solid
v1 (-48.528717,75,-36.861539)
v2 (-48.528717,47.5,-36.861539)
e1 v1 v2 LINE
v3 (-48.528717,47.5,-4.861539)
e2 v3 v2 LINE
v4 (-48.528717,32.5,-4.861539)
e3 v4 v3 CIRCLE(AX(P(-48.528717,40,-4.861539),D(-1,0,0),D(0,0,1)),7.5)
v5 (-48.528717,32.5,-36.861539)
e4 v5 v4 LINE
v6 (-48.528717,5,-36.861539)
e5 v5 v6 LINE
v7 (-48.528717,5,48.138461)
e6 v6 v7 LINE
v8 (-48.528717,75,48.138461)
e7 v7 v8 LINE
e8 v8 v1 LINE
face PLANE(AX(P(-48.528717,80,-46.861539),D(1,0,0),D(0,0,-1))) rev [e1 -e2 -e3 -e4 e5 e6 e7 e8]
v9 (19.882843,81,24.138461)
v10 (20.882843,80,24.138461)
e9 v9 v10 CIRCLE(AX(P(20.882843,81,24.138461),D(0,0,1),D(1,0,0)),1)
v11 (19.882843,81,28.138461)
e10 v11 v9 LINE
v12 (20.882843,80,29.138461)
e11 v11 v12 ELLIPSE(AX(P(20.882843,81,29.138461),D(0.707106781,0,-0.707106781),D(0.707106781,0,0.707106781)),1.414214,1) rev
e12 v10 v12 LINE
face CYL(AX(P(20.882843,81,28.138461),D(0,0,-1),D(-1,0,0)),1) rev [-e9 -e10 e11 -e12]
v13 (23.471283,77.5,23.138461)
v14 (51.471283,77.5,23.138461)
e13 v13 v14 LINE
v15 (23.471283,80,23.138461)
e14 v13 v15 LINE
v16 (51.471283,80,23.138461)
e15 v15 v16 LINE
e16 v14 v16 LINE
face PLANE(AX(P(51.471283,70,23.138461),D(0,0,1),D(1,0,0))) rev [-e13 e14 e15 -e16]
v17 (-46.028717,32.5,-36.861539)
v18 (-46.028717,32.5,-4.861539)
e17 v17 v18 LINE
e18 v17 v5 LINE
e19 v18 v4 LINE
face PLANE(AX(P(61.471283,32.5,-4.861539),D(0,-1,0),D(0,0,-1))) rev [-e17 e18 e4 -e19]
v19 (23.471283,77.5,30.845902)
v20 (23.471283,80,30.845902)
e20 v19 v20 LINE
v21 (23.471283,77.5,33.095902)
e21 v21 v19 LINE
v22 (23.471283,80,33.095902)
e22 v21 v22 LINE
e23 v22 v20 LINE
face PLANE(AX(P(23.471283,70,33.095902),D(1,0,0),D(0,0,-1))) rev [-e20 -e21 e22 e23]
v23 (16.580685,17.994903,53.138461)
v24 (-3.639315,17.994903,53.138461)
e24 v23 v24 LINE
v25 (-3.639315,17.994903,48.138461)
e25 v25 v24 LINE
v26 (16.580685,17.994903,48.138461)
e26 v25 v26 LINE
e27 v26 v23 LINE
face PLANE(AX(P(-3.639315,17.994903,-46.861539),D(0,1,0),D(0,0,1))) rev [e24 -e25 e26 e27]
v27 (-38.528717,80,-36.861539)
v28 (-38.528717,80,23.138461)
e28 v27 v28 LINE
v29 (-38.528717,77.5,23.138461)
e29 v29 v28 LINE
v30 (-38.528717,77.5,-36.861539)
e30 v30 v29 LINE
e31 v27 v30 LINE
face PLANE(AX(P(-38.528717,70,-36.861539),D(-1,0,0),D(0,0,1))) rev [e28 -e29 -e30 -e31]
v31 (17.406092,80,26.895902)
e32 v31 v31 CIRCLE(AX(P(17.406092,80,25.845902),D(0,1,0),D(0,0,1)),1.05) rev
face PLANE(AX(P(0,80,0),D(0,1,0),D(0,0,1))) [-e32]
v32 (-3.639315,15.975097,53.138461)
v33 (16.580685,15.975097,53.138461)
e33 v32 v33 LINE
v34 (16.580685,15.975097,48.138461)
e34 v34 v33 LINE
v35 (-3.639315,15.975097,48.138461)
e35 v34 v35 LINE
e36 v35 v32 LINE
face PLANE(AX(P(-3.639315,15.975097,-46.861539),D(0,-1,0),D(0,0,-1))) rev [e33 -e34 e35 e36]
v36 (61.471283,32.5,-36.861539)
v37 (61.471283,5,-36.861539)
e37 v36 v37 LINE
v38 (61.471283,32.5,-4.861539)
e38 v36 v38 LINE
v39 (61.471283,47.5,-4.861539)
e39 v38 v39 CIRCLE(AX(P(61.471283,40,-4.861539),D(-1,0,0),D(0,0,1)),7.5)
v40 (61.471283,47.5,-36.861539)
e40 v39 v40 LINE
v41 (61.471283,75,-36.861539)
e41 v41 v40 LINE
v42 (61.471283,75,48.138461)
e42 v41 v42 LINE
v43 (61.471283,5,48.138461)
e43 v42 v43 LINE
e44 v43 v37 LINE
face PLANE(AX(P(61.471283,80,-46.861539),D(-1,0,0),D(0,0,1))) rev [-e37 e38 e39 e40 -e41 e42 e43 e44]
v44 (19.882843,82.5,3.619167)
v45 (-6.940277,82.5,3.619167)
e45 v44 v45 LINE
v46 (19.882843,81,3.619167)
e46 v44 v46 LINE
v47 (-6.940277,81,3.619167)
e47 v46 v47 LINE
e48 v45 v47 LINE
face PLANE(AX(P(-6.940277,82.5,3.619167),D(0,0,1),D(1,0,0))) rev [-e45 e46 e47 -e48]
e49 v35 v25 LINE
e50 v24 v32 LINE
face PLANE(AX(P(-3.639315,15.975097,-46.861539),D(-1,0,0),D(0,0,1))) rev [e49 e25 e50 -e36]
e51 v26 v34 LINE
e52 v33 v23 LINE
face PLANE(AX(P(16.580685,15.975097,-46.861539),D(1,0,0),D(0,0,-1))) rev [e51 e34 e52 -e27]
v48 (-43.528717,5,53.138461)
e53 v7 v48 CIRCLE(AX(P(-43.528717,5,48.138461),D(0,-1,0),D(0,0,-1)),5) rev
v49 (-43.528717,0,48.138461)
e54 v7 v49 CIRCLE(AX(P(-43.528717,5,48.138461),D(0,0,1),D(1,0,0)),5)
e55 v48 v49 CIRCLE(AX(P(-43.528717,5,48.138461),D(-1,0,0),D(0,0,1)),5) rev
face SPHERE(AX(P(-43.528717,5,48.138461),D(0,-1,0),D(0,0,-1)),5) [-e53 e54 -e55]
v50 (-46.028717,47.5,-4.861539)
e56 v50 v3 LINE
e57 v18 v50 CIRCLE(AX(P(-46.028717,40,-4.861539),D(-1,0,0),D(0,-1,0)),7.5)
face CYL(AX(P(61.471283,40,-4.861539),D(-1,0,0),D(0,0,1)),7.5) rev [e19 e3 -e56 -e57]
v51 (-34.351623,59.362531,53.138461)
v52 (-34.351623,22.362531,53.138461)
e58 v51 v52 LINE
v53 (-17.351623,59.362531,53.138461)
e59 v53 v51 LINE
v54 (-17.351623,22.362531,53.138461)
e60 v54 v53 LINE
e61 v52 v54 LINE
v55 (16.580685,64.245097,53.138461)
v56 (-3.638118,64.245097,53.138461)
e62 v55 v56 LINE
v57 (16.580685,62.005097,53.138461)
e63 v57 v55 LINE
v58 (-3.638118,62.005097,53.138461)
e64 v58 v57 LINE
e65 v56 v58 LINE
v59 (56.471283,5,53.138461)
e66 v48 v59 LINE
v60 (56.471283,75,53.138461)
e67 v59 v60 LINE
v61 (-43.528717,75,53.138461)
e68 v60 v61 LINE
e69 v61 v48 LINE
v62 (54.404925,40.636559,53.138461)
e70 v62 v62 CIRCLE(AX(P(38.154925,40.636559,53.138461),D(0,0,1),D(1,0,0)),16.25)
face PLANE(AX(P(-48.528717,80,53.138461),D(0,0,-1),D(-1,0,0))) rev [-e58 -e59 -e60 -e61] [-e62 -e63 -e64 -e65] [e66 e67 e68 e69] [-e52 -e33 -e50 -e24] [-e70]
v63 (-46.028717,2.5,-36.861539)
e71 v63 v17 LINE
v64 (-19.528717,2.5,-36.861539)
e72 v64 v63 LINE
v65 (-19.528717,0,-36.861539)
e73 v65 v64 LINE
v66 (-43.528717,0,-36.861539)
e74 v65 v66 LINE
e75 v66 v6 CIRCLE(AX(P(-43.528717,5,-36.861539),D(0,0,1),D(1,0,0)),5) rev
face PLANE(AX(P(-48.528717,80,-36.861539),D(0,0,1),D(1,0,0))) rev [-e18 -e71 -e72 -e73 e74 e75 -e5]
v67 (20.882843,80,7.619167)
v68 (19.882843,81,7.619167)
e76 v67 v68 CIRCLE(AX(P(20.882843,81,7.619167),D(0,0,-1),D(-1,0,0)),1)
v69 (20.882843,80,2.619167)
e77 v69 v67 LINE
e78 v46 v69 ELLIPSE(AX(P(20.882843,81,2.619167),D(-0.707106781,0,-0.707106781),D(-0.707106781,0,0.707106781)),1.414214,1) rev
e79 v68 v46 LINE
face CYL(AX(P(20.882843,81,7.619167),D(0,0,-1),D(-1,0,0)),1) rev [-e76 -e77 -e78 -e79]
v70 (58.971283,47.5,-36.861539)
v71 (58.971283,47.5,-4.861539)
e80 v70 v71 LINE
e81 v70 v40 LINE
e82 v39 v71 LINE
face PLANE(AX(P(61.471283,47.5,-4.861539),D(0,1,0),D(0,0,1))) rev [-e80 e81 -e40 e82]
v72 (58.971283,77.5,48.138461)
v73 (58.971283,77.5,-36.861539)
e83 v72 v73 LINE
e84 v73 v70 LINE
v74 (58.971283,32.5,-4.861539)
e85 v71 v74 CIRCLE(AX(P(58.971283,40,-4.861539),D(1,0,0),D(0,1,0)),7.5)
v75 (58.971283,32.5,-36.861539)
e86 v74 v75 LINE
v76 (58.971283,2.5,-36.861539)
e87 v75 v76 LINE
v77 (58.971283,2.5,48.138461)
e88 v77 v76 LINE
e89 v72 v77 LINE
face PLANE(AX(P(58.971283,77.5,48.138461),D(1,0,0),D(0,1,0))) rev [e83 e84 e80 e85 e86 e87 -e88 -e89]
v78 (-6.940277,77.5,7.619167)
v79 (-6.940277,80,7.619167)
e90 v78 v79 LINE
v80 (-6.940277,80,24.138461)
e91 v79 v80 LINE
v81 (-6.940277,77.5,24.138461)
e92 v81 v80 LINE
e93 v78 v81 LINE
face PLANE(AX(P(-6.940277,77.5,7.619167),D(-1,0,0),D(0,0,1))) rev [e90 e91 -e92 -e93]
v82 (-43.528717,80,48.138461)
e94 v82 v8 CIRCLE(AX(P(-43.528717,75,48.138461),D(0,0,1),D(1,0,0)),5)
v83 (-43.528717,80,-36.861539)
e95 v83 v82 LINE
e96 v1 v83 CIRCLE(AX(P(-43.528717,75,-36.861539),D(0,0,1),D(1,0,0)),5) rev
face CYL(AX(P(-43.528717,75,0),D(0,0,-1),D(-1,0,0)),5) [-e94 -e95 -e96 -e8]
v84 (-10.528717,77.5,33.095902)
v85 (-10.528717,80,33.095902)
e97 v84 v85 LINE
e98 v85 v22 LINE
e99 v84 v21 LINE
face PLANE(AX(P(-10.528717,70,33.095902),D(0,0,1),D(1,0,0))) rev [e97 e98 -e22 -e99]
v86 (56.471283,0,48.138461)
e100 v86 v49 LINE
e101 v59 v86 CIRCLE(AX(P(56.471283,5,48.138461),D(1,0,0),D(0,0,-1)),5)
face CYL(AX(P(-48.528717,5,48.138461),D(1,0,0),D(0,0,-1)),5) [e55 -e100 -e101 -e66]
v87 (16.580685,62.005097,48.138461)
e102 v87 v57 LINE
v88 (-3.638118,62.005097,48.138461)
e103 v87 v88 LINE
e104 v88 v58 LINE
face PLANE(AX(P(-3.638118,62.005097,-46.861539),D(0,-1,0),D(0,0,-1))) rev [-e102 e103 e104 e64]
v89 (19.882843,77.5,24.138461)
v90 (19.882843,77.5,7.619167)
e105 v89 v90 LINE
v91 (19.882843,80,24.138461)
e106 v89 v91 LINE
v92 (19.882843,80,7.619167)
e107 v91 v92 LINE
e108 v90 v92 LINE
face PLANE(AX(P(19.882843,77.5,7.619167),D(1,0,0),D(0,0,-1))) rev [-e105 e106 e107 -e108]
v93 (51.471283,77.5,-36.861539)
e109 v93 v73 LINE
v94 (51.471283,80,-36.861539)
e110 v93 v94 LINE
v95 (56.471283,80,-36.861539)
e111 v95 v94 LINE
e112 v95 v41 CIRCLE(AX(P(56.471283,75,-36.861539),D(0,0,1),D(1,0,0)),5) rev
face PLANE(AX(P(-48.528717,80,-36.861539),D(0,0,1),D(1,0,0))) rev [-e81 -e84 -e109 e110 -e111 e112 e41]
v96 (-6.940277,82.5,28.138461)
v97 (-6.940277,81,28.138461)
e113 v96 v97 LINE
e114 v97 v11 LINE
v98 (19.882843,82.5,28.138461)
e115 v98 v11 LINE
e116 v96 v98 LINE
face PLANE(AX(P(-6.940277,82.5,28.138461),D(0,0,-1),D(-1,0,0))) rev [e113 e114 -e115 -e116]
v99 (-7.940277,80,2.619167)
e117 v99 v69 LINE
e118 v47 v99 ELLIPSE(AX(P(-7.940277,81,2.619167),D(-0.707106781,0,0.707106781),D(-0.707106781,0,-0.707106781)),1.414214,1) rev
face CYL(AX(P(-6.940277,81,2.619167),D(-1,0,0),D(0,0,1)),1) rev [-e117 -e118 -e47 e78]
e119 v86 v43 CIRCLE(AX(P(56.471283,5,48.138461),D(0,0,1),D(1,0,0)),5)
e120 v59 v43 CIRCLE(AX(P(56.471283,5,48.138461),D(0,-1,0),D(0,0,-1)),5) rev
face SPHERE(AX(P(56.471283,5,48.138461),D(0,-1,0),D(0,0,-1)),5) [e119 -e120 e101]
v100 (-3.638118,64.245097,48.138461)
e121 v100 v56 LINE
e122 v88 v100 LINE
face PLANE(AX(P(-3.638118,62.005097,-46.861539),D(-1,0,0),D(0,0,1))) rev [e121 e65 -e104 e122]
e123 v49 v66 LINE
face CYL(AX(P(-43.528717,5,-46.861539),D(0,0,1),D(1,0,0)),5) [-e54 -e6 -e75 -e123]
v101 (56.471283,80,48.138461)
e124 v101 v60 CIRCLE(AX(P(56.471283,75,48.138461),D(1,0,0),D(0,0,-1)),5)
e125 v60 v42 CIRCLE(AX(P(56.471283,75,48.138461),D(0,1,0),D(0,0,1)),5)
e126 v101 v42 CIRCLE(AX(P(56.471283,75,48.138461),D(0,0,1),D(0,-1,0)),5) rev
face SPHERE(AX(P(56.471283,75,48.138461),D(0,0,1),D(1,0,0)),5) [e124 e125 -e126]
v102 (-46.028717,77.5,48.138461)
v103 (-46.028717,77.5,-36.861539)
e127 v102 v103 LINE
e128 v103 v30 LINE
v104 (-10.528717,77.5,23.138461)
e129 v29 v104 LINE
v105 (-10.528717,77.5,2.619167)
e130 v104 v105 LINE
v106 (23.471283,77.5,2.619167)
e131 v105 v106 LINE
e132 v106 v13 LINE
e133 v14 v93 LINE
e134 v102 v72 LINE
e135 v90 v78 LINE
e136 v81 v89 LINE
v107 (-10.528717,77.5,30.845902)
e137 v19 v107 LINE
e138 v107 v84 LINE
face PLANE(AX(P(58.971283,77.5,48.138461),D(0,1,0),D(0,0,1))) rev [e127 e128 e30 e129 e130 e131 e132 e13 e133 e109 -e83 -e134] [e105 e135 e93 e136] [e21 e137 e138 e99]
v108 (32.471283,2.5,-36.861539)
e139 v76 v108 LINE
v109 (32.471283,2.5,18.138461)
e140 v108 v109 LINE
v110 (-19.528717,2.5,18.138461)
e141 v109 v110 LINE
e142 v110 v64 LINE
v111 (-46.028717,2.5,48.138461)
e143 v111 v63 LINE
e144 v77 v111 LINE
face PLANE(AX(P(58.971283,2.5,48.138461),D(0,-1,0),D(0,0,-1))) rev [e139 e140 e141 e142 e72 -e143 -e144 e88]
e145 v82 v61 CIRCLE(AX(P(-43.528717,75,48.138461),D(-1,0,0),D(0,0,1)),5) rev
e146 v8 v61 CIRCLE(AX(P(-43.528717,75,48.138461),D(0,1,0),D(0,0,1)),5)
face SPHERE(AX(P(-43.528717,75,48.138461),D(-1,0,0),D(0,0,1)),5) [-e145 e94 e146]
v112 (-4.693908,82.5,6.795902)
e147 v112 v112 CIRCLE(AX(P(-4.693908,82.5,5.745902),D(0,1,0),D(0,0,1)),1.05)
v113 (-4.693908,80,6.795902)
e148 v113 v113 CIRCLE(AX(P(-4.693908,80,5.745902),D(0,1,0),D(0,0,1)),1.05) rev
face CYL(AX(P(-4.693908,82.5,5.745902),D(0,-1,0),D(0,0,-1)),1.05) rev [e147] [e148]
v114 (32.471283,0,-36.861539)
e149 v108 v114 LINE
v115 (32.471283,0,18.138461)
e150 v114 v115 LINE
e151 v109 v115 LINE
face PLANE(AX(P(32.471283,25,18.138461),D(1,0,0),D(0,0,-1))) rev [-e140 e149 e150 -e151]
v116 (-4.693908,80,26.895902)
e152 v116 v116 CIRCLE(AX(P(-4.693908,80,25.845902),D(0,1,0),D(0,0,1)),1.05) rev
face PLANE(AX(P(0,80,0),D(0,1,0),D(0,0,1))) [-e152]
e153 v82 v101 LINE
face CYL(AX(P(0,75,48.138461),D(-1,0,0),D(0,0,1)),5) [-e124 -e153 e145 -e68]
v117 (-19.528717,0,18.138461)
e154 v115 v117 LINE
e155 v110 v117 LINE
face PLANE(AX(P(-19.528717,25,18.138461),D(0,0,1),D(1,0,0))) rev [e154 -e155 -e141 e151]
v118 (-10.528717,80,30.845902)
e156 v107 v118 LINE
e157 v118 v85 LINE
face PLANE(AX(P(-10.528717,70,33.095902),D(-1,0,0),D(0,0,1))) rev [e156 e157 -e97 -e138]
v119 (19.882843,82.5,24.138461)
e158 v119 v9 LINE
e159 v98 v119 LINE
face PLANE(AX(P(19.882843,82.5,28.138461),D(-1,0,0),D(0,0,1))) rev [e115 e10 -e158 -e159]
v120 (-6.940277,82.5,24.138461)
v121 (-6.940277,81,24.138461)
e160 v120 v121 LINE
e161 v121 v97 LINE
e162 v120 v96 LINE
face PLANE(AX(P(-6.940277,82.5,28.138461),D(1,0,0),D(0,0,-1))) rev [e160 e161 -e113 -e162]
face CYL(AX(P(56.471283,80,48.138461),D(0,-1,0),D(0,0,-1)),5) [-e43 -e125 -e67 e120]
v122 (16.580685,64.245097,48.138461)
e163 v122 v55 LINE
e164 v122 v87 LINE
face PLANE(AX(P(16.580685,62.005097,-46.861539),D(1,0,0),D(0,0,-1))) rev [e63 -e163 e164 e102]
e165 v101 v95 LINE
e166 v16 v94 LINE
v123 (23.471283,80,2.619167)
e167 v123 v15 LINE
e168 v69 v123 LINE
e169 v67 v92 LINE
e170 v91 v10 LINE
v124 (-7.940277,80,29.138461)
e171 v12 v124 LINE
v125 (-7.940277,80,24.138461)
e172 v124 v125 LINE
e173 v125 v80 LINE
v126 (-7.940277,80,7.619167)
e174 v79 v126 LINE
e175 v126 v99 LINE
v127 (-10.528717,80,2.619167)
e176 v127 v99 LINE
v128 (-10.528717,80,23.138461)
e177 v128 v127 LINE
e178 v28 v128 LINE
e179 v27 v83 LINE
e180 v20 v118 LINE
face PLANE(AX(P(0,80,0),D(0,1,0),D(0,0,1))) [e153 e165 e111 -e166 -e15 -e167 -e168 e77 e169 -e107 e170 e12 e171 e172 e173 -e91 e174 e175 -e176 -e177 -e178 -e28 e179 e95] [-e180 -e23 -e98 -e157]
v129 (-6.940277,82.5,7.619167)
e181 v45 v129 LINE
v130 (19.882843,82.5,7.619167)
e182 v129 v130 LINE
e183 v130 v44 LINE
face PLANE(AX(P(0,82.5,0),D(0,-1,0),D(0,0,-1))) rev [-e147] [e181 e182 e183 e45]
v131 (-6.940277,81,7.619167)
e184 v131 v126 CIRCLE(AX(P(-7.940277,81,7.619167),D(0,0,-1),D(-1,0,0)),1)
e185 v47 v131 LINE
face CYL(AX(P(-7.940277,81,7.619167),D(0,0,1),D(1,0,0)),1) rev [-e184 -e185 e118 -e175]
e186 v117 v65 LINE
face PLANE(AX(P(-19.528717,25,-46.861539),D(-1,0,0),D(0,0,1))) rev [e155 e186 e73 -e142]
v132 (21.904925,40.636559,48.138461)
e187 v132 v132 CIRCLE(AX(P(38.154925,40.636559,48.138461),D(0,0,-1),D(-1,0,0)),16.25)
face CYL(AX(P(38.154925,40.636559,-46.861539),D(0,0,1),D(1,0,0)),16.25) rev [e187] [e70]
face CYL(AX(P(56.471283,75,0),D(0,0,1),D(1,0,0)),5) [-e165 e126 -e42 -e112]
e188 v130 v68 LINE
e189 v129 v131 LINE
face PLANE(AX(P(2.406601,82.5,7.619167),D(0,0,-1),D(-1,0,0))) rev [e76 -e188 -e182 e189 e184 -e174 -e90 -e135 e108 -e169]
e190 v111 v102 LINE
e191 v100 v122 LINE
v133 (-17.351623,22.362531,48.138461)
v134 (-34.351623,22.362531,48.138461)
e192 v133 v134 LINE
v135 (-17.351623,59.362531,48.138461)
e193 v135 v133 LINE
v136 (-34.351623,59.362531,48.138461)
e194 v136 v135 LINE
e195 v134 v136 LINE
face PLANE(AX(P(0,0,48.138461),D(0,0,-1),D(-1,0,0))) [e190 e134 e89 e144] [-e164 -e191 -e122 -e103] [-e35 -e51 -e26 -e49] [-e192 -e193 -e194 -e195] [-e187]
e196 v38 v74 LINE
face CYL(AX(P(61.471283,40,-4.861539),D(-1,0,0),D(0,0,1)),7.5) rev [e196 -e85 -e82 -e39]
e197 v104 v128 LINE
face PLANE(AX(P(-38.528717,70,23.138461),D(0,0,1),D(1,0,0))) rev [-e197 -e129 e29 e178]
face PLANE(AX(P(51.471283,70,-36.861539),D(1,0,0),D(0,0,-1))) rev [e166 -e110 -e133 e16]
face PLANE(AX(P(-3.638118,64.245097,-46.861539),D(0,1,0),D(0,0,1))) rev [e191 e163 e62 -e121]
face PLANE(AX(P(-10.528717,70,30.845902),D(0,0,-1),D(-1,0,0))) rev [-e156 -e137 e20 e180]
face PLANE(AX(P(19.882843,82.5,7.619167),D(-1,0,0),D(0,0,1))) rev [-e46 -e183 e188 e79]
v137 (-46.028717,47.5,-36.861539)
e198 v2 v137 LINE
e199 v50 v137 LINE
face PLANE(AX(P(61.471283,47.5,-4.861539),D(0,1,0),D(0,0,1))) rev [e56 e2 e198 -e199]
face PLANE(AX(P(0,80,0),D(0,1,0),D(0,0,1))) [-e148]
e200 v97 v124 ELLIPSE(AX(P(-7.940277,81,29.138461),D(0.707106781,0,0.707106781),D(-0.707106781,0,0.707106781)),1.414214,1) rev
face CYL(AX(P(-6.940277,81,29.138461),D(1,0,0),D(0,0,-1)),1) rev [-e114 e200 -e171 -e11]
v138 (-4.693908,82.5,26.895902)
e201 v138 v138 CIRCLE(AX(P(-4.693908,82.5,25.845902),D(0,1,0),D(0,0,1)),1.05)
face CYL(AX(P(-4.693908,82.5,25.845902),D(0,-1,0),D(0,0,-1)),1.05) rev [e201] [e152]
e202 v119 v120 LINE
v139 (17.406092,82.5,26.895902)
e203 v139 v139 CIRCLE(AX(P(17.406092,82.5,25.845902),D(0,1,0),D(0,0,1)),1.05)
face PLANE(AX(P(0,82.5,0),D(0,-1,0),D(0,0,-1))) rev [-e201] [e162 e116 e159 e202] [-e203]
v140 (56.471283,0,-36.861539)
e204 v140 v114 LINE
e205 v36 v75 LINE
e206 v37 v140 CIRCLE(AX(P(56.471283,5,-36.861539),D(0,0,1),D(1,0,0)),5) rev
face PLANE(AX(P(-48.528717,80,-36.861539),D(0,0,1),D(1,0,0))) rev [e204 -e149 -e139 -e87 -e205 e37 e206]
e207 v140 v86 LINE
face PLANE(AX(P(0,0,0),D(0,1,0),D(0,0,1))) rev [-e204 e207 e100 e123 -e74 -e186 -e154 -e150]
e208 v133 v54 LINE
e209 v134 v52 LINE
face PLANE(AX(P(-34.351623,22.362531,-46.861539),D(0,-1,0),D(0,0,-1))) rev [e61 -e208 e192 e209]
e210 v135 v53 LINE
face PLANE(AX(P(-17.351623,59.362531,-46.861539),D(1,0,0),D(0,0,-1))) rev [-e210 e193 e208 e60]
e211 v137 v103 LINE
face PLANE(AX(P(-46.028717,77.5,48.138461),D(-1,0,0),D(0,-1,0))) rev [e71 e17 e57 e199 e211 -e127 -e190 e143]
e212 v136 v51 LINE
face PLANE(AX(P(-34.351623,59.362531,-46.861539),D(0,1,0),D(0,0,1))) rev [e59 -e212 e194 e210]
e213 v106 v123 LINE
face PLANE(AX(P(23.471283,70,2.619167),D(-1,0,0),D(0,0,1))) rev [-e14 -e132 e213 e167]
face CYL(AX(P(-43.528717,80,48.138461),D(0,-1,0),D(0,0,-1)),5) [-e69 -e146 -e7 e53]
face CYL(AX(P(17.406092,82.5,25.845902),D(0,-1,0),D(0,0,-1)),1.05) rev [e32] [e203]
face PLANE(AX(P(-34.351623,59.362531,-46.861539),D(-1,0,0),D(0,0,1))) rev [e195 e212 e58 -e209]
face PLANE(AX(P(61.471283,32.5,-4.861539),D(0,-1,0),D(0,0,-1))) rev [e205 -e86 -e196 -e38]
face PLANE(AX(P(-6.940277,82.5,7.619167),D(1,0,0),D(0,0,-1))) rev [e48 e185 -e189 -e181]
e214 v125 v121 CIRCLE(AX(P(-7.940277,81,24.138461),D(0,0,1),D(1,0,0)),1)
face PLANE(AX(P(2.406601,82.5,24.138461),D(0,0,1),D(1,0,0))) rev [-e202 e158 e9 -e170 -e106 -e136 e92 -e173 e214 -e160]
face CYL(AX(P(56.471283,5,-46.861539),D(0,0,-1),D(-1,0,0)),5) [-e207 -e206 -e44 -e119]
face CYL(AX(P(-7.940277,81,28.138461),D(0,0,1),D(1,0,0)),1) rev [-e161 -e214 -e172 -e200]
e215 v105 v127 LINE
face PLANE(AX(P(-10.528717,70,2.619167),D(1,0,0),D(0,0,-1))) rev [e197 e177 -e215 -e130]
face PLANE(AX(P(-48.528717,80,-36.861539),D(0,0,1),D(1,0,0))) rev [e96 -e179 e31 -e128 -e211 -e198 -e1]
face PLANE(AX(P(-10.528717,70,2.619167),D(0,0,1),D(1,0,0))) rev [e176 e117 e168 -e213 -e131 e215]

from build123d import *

# Parameters (mm, degrees)
ESQUISSE1_W             = 110
ESQUISSE1_H             = 100
BOSS_EXTRU_1_DEPTH      = 80
ESQUISSE3_W             = 105
ESQUISSE3_H             = 75
ENL_V_MAT_EXTRU_1_DEPTH = 95
ESQUISSE4_R             = 16.25
ESQUISSE4_W             = 17
ESQUISSE4_H             = 37
ESQUISSE4_W_2           = 20.218803133
ESQUISSE4_H_2           = 2.24
ESQUISSE4_W_3           = 20.22
ESQUISSE4_H_3           = 2.019806643
ENL_V_MAT_EXTRU_2_DEPTH = 143.051816821
CONG_2_R                = 5
ENL_V_MAT_EXTRU_3_DEPTH = 25
ENL_V_MAT_EXTRU_4_DEPTH = 147.026353909
ESQUISSE7_W             = 110
ESQUISSE7_H             = 10
ENL_V_MAT_EXTRU_5_DEPTH = 115.028131169
ESQUISSE8_R             = 1.05
BOSS_EXTRU_4_DEPTH      = 2.5
ESQUISSE12_W            = 26.823119757
ESQUISSE12_H            = 16.51929352
ENL_V_MAT_EXTRU_8_DEPTH = 2.5
CONG_3_R                = 1
ESQUISSE13_W            = 34
ESQUISSE13_H            = 2.25
ENL_V_MAT_EXTRU_9_DEPTH = 10


with BuildPart() as part:
    # Esquisse1 → Boss.-Extru.1 (new body)
    with BuildSketch(Plane(origin=(0, 0, 0), x_dir=(1, 0, 0), z_dir=(0, 1, 0))):
        with Locations((6.471283231, -3.138460985)):
            Rectangle(ESQUISSE1_W, ESQUISSE1_H)
    extrude(amount=BOSS_EXTRU_1_DEPTH)

    # Esquisse3 → Enlèv. mat.-Extru.1 (cut)
    with BuildSketch(Plane(origin=(0, 0, -46.861539015), x_dir=(-1, 0, 0), z_dir=(0, 0, -1))):
        with Locations((-6.471283231, 40)):
            Rectangle(ESQUISSE3_W, ESQUISSE3_H)
    extrude(amount=-ENL_V_MAT_EXTRU_1_DEPTH, mode=Mode.SUBTRACT)

    # Esquisse4 → Enlèv. mat.-Extru.2 (cut, through all)
    with BuildSketch(Plane.XY.offset(53.138460985)):
        with Locations((38.154925434, 40.636559031)):
            Circle(ESQUISSE4_R)
        with Locations((-25.851622586, 40.86253144)):
            Rectangle(ESQUISSE4_W, ESQUISSE4_H)
        with Locations((6.471283232, 63.12509684)):
            Rectangle(ESQUISSE4_W_2, ESQUISSE4_H_2)
        with Locations((6.470684798, 16.984999839)):
            Rectangle(ESQUISSE4_W_3, ESQUISSE4_H_3)
    extrude(amount=-ENL_V_MAT_EXTRU_2_DEPTH, mode=Mode.SUBTRACT)

    # Congé2
    cong_2_edges = [part.edges().sort_by_distance(p)[0] for p in [
        (61.471283231, 80, 3.138460985),
        (-48.528716769, 80, 3.138460985),
        (61.471283231, 0, 3.138460985),
        (6.471283231, 0, 53.138460985),
        (-48.528716769, 0, 3.138460985),
        (61.471283231, 40, 53.138460985),
        (-48.528716769, 40, 53.138460985),
        (6.471283231, 80, 53.138460985),
    ]]
    fillet(cong_2_edges, radius=CONG_2_R)

    # Esquisse5 → Enlèv. mat.-Extru.3 (cut)
    with BuildSketch(Plane.XZ):
        Polygon((6.471283231, -46.861539015), (32.471283231, -46.861539015), (32.471283231, 18.138460985), (-19.528716769, 18.138460985), (-19.528716769, -46.861539015), align=None)
    extrude(amount=-ENL_V_MAT_EXTRU_3_DEPTH, mode=Mode.SUBTRACT)

    # Esquisse6 → Enlèv. mat.-Extru.4 (cut, through all)
    with BuildSketch(Plane.ZY.offset(48.528716769)):
        with BuildLine():
            Line((-4.861539015, 47.5), (-46.861539015, 47.5))
            Line((-46.861539015, 47.5), (-46.861539015, 32.5))
            Line((-46.861539015, 32.5), (-4.861539015, 32.5))
            ThreePointArc((-4.861539015, 32.5), (2.638460985, 40), (-4.861539015, 47.5))
        make_face()
    extrude(amount=-ENL_V_MAT_EXTRU_4_DEPTH, mode=Mode.SUBTRACT)

    # Esquisse7 → Enlèv. mat.-Extru.5 (cut, through all)
    with BuildSketch(Plane.XZ):
        with Locations((6.471283231, -41.861539015)):
            Rectangle(ESQUISSE7_W, ESQUISSE7_H)
    extrude(amount=-ENL_V_MAT_EXTRU_5_DEPTH, mode=Mode.SUBTRACT)

    # Esquisse8 → Boss.-Extru.4 (add)
    # profile 1 of 2: a face of its own
    with BuildSketch(Plane(origin=(0, 80, 0), x_dir=(1, 0, 0), z_dir=(0, 1, 0))):
        Polygon((-6.940276647, -28.138460985), (19.88284311, -28.138460985), (19.88284311, -24.138460985), (2.406600831, -24.138460985), (-6.940276647, -24.138460985), align=None)
        with Locations(Location((17.406091919, -25.845902422, 0), (0, 0, 270))):
            Circle(ESQUISSE8_R, mode=Mode.SUBTRACT)
        with Locations(Location((-4.693908081, -25.845902422, 0), (0, 0, 270))):
            Circle(ESQUISSE8_R, mode=Mode.SUBTRACT)
    # profile 2 of 2: a face of its own
    with BuildSketch(Plane(origin=(0, 80, 0), x_dir=(1, 0, 0), z_dir=(0, 1, 0))):
        Polygon((-6.940276647, -3.619167465), (19.88284311, -3.619167465), (19.88284311, -7.619167465), (2.406600831, -7.619167465), (-6.940276647, -7.619167465), align=None)
        with Locations(Location((-4.693908081, -5.745902422, 0), (0, 0, 270))):
            Circle(ESQUISSE8_R, mode=Mode.SUBTRACT)
    extrude(amount=BOSS_EXTRU_4_DEPTH)

    # Esquisse12 → Enlèv. mat.-Extru.8 (cut)
    with BuildSketch(Plane(origin=(0, 80, 0), x_dir=(1, 0, 0), z_dir=(0, 1, 0))):
        with Locations((6.471283231, -15.878814225)):
            Rectangle(ESQUISSE12_W, ESQUISSE12_H)
    extrude(amount=-ENL_V_MAT_EXTRU_8_DEPTH, mode=Mode.SUBTRACT)

    # Congé3
    # the kernel refuses this fillet: 1 mm, written as the material it adds along each edge
    with BuildSketch(Plane(origin=(19.88284311, 80, 3.619167465), x_dir=(1, 0, 0), z_dir=(0, 0, 1))) as cong_3_piece_1_section:
        with BuildLine():
            CenterArc((CONG_3_R, CONG_3_R), CONG_3_R, 180, 90)
            Line((0, CONG_3_R), (-CONG_3_R * 0.02, CONG_3_R))
            Line((-CONG_3_R * 0.02, CONG_3_R), (-CONG_3_R * 0.02, -CONG_3_R * 0.02))
            Line((-CONG_3_R * 0.02, -CONG_3_R * 0.02), (CONG_3_R, -CONG_3_R * 0.02))
            Line((CONG_3_R, -CONG_3_R * 0.02), (CONG_3_R, 0))
        make_face()
    cong_3_piece_1 = extrude(amount=4, mode=Mode.PRIVATE)
    cong_3_piece_1 = split(cong_3_piece_1, bisect_by=Plane(origin=(19.88284311, 80.20347313, 5.619167465), z_dir=(1, 0, 0)), keep=Keep.TOP, mode=Mode.PRIVATE)
    add(cong_3_piece_1)
    with BuildSketch(Plane(origin=(-6.940276647, 80, 3.619167465), x_dir=(0, 0, -1), z_dir=(1, 0, 0))) as cong_3_piece_2:
        with BuildLine():
            CenterArc((CONG_3_R, CONG_3_R), CONG_3_R, 180, 90)
            Line((0, CONG_3_R), (-CONG_3_R * 0.02, CONG_3_R))
            Line((-CONG_3_R * 0.02, CONG_3_R), (-CONG_3_R * 0.02, -CONG_3_R * 0.02))
            Line((-CONG_3_R * 0.02, -CONG_3_R * 0.02), (CONG_3_R, -CONG_3_R * 0.02))
            Line((CONG_3_R, -CONG_3_R * 0.02), (CONG_3_R, 0))
        make_face()
    extrude(amount=26.823119757)
    with BuildSketch(Plane(origin=(-6.940276647, 80, 7.619167465), x_dir=(-1, 0, 0), z_dir=(0, 0, -1))) as cong_3_piece_3_section:
        with BuildLine():
            CenterArc((CONG_3_R, CONG_3_R), CONG_3_R, 180, 90)
            Line((0, CONG_3_R), (-CONG_3_R * 0.02, CONG_3_R))
            Line((-CONG_3_R * 0.02, CONG_3_R), (-CONG_3_R * 0.02, -CONG_3_R * 0.02))
            Line((-CONG_3_R * 0.02, -CONG_3_R * 0.02), (CONG_3_R, -CONG_3_R * 0.02))
            Line((CONG_3_R, -CONG_3_R * 0.02), (CONG_3_R, 0))
        make_face()
    cong_3_piece_3 = extrude(amount=4, mode=Mode.PRIVATE)
    cong_3_piece_3 = split(cong_3_piece_3, bisect_by=Plane(origin=(-6.940276647, 80.20347313, 5.619167465), z_dir=(-1, 0, 0)), keep=Keep.TOP, mode=Mode.PRIVATE)
    add(cong_3_piece_3)
    with BuildSketch(Plane(origin=(-6.940276647, 80, 24.138460985), x_dir=(-1, 0, 0), z_dir=(0, 0, 1))) as cong_3_piece_4_section:
        with BuildLine():
            CenterArc((CONG_3_R, -CONG_3_R), CONG_3_R, 90, 90)
            Line((0, -CONG_3_R), (-CONG_3_R * 0.02, -CONG_3_R))
            Line((-CONG_3_R * 0.02, -CONG_3_R), (-CONG_3_R * 0.02, CONG_3_R * 0.02))
            Line((-CONG_3_R * 0.02, CONG_3_R * 0.02), (CONG_3_R, CONG_3_R * 0.02))
            Line((CONG_3_R, CONG_3_R * 0.02), (CONG_3_R, 0))
        make_face()
    cong_3_piece_4 = extrude(amount=4, mode=Mode.PRIVATE)
    cong_3_piece_4 = split(cong_3_piece_4, bisect_by=Plane(origin=(-6.940276647, 80.20347313, 26.138460985), z_dir=(-1, 0, 0)), keep=Keep.TOP, mode=Mode.PRIVATE)
    add(cong_3_piece_4)
    with BuildSketch(Plane(origin=(-6.940276647, 80, 28.138460985), x_dir=(0, 0, 1), z_dir=(1, 0, 0))) as cong_3_piece_5:
        with BuildLine():
            CenterArc((CONG_3_R, -CONG_3_R), CONG_3_R, 90, 90)
            Line((0, -CONG_3_R), (-CONG_3_R * 0.02, -CONG_3_R))
            Line((-CONG_3_R * 0.02, -CONG_3_R), (-CONG_3_R * 0.02, CONG_3_R * 0.02))
            Line((-CONG_3_R * 0.02, CONG_3_R * 0.02), (CONG_3_R, CONG_3_R * 0.02))
            Line((CONG_3_R, CONG_3_R * 0.02), (CONG_3_R, 0))
        make_face()
    extrude(amount=26.823119757)
    with BuildSketch(Plane(origin=(19.88284311, 80, 28.138460985), x_dir=(1, 0, 0), z_dir=(0, 0, -1))) as cong_3_piece_6_section:
        with BuildLine():
            CenterArc((CONG_3_R, -CONG_3_R), CONG_3_R, 90, 90)
            Line((0, -CONG_3_R), (-CONG_3_R * 0.02, -CONG_3_R))
            Line((-CONG_3_R * 0.02, -CONG_3_R), (-CONG_3_R * 0.02, CONG_3_R * 0.02))
            Line((-CONG_3_R * 0.02, CONG_3_R * 0.02), (CONG_3_R, CONG_3_R * 0.02))
            Line((CONG_3_R, CONG_3_R * 0.02), (CONG_3_R, 0))
        make_face()
    cong_3_piece_6 = extrude(amount=4, mode=Mode.PRIVATE)
    cong_3_piece_6 = split(cong_3_piece_6, bisect_by=Plane(origin=(19.88284311, 80.20347313, 26.138460985), z_dir=(1, 0, 0)), keep=Keep.TOP, mode=Mode.PRIVATE)
    add(cong_3_piece_6)
    with BuildSketch(Plane(origin=(-6.940276647, 80, 3.619167465), x_dir=(0, 0, -1), z_dir=(1, 0, 0))) as cong_3_piece_7a_section:
        with BuildLine():
            CenterArc((CONG_3_R, CONG_3_R), CONG_3_R, 180, 90)
            Line((0, CONG_3_R), (-CONG_3_R * 0.02, CONG_3_R))
            Line((-CONG_3_R * 0.02, CONG_3_R), (-CONG_3_R * 0.02, -CONG_3_R * 0.02))
            Line((-CONG_3_R * 0.02, -CONG_3_R * 0.02), (CONG_3_R, -CONG_3_R * 0.02))
            Line((CONG_3_R, -CONG_3_R * 0.02), (CONG_3_R, 0))
        make_face()
    cong_3_piece_7a = extrude(amount=29.323119757, mode=Mode.PRIVATE)
    cong_3_piece_7a = split(cong_3_piece_7a, bisect_by=Plane(origin=(19.88284311, 80.226395114, 3.39277235), z_dir=(1, 0, 0)), keep=Keep.TOP, mode=Mode.PRIVATE)
    with BuildSketch(Plane(origin=(19.88284311, 80, 1.119167465), x_dir=(1, 0, 0), z_dir=(0, 0, 1))) as cong_3_piece_7b_section:
        with BuildLine():
            CenterArc((CONG_3_R, CONG_3_R), CONG_3_R, 180, 90)
            Line((0, CONG_3_R), (-CONG_3_R * 0.02, CONG_3_R))
            Line((-CONG_3_R * 0.02, CONG_3_R), (-CONG_3_R * 0.02, -CONG_3_R * 0.02))
            Line((-CONG_3_R * 0.02, -CONG_3_R * 0.02), (CONG_3_R, -CONG_3_R * 0.02))
            Line((CONG_3_R, -CONG_3_R * 0.02), (CONG_3_R, 0))
        make_face()
    cong_3_piece_7b = extrude(amount=6.5, mode=Mode.PRIVATE)
    cong_3_piece_7b = split(cong_3_piece_7b, bisect_by=Plane(origin=(19.88284311, 80.20347313, 2.369167465), z_dir=(1, 0, 0)), keep=Keep.TOP, mode=Mode.PRIVATE)
    cong_3_piece_7b = split(cong_3_piece_7b, bisect_by=Plane(origin=(20.12979416, 80.20347313, 3.619167465), z_dir=(0, 0, -1)), keep=Keep.TOP, mode=Mode.PRIVATE)
    cong_3_piece_7 = cong_3_piece_7a & cong_3_piece_7b
    add(cong_3_piece_7)
    with BuildSketch(Plane(origin=(-6.940276647, 80, 7.619167465), x_dir=(-1, 0, 0), z_dir=(0, 0, -1))) as cong_3_piece_8a_section:
        with BuildLine():
            CenterArc((CONG_3_R, CONG_3_R), CONG_3_R, 180, 90)
            Line((0, CONG_3_R), (-CONG_3_R * 0.02, CONG_3_R))
            Line((-CONG_3_R * 0.02, CONG_3_R), (-CONG_3_R * 0.02, -CONG_3_R * 0.02))
            Line((-CONG_3_R * 0.02, -CONG_3_R * 0.02), (CONG_3_R, -CONG_3_R * 0.02))
            Line((CONG_3_R, -CONG_3_R * 0.02), (CONG_3_R, 0))
        make_face()
    cong_3_piece_8a = extrude(amount=6.5, mode=Mode.PRIVATE)
    cong_3_piece_8a = split(cong_3_piece_8a, bisect_by=Plane(origin=(-6.940276647, 80.20347313, 2.369167465), z_dir=(-1, 0, 0)), keep=Keep.TOP, mode=Mode.PRIVATE)
    cong_3_piece_8a = split(cong_3_piece_8a, bisect_by=Plane(origin=(-7.187227698, 80.20347313, 3.619167465), z_dir=(0, 0, -1)), keep=Keep.TOP, mode=Mode.PRIVATE)
    with BuildSketch(Plane(origin=(-9.440276647, 80, 3.619167465), x_dir=(0, 0, -1), z_dir=(1, 0, 0))) as cong_3_piece_8b_section:
        with BuildLine():
            CenterArc((CONG_3_R, CONG_3_R), CONG_3_R, 180, 90)
            Line((0, CONG_3_R), (-CONG_3_R * 0.02, CONG_3_R))
            Line((-CONG_3_R * 0.02, CONG_3_R), (-CONG_3_R * 0.02, -CONG_3_R * 0.02))
            Line((-CONG_3_R * 0.02, -CONG_3_R * 0.02), (CONG_3_R, -CONG_3_R * 0.02))
            Line((CONG_3_R, -CONG_3_R * 0.02), (CONG_3_R, 0))
        make_face()
    cong_3_piece_8b = extrude(amount=29.323119757, mode=Mode.PRIVATE)
    cong_3_piece_8b = split(cong_3_piece_8b, bisect_by=Plane(origin=(-6.940276647, 80.226395114, 3.39277235), z_dir=(-1, 0, 0)), keep=Keep.TOP, mode=Mode.PRIVATE)
    cong_3_piece_8 = cong_3_piece_8a & cong_3_piece_8b
    add(cong_3_piece_8)
    with BuildSketch(Plane(origin=(-9.440276647, 80, 28.138460985), x_dir=(0, 0, 1), z_dir=(1, 0, 0))) as cong_3_piece_9a_section:
        with BuildLine():
            CenterArc((CONG_3_R, -CONG_3_R), CONG_3_R, 90, 90)
            Line((0, -CONG_3_R), (-CONG_3_R * 0.02, -CONG_3_R))
            Line((-CONG_3_R * 0.02, -CONG_3_R), (-CONG_3_R * 0.02, CONG_3_R * 0.02))
            Line((-CONG_3_R * 0.02, CONG_3_R * 0.02), (CONG_3_R, CONG_3_R * 0.02))
            Line((CONG_3_R, CONG_3_R * 0.02), (CONG_3_R, 0))
        make_face()
    cong_3_piece_9a = extrude(amount=29.323119757, mode=Mode.PRIVATE)
    cong_3_piece_9a = split(cong_3_piece_9a, bisect_by=Plane(origin=(-6.940276647, 80.226395114, 28.3648561), z_dir=(-1, 0, 0)), keep=Keep.TOP, mode=Mode.PRIVATE)
    with BuildSketch(Plane(origin=(-6.940276647, 80, 24.138460985), x_dir=(-1, 0, 0), z_dir=(0, 0, 1))) as cong_3_piece_9b_section:
        with BuildLine():
            CenterArc((CONG_3_R, -CONG_3_R), CONG_3_R, 90, 90)
            Line((0, -CONG_3_R), (-CONG_3_R * 0.02, -CONG_3_R))
            Line((-CONG_3_R * 0.02, -CONG_3_R), (-CONG_3_R * 0.02, CONG_3_R * 0.02))
            Line((-CONG_3_R * 0.02, CONG_3_R * 0.02), (CONG_3_R, CONG_3_R * 0.02))
            Line((CONG_3_R, CONG_3_R * 0.02), (CONG_3_R, 0))
        make_face()
    cong_3_piece_9b = extrude(amount=6.5, mode=Mode.PRIVATE)
    cong_3_piece_9b = split(cong_3_piece_9b, bisect_by=Plane(origin=(-6.940276647, 80.20347313, 29.388460985), z_dir=(-1, 0, 0)), keep=Keep.TOP, mode=Mode.PRIVATE)
    cong_3_piece_9b = split(cong_3_piece_9b, bisect_by=Plane(origin=(-7.187227698, 80.20347313, 28.138460985), z_dir=(0, 0, 1)), keep=Keep.TOP, mode=Mode.PRIVATE)
    cong_3_piece_9 = cong_3_piece_9a & cong_3_piece_9b
    add(cong_3_piece_9)
    with BuildSketch(Plane(origin=(19.88284311, 80, 30.638460985), x_dir=(1, 0, 0), z_dir=(0, 0, -1))) as cong_3_piece_10a_section:
        with BuildLine():
            CenterArc((CONG_3_R, -CONG_3_R), CONG_3_R, 90, 90)
            Line((0, -CONG_3_R), (-CONG_3_R * 0.02, -CONG_3_R))
            Line((-CONG_3_R * 0.02, -CONG_3_R), (-CONG_3_R * 0.02, CONG_3_R * 0.02))
            Line((-CONG_3_R * 0.02, CONG_3_R * 0.02), (CONG_3_R, CONG_3_R * 0.02))
            Line((CONG_3_R, CONG_3_R * 0.02), (CONG_3_R, 0))
        make_face()
    cong_3_piece_10a = extrude(amount=6.5, mode=Mode.PRIVATE)
    cong_3_piece_10a = split(cong_3_piece_10a, bisect_by=Plane(origin=(19.88284311, 80.20347313, 29.388460985), z_dir=(1, 0, 0)), keep=Keep.TOP, mode=Mode.PRIVATE)
    cong_3_piece_10a = split(cong_3_piece_10a, bisect_by=Plane(origin=(20.12979416, 80.20347313, 28.138460985), z_dir=(0, 0, 1)), keep=Keep.TOP, mode=Mode.PRIVATE)
    with BuildSketch(Plane(origin=(-6.940276647, 80, 28.138460985), x_dir=(0, 0, 1), z_dir=(1, 0, 0))) as cong_3_piece_10b_section:
        with BuildLine():
            CenterArc((CONG_3_R, -CONG_3_R), CONG_3_R, 90, 90)
            Line((0, -CONG_3_R), (-CONG_3_R * 0.02, -CONG_3_R))
            Line((-CONG_3_R * 0.02, -CONG_3_R), (-CONG_3_R * 0.02, CONG_3_R * 0.02))
            Line((-CONG_3_R * 0.02, CONG_3_R * 0.02), (CONG_3_R, CONG_3_R * 0.02))
            Line((CONG_3_R, CONG_3_R * 0.02), (CONG_3_R, 0))
        make_face()
    cong_3_piece_10b = extrude(amount=29.323119757, mode=Mode.PRIVATE)
    cong_3_piece_10b = split(cong_3_piece_10b, bisect_by=Plane(origin=(19.88284311, 80.226395114, 28.3648561), z_dir=(1, 0, 0)), keep=Keep.TOP, mode=Mode.PRIVATE)
    cong_3_piece_10 = cong_3_piece_10a & cong_3_piece_10b
    add(cong_3_piece_10)

    # Esquisse13 → Enlèv. mat.-Extru.9 (cut)
    with BuildSketch(Plane(origin=(0, 80, 0), x_dir=(1, 0, 0), z_dir=(0, 1, 0))):
        Polygon((-38.528716769, 36.861539015), (51.471283231, 36.861539015), (51.471283231, -23.138460985), (23.471283231, -23.138460985), (23.471283231, -2.619167465), (-10.528716769, -2.619167465), (-10.528716769, -23.138460985), (-38.528716769, -23.138460985), align=None)
        with Locations((6.471283231, -31.970902422)):
            Rectangle(ESQUISSE13_W, ESQUISSE13_H)
    extrude(amount=-ENL_V_MAT_EXTRU_9_DEPTH, mode=Mode.SUBTRACT)


solid = part.part
